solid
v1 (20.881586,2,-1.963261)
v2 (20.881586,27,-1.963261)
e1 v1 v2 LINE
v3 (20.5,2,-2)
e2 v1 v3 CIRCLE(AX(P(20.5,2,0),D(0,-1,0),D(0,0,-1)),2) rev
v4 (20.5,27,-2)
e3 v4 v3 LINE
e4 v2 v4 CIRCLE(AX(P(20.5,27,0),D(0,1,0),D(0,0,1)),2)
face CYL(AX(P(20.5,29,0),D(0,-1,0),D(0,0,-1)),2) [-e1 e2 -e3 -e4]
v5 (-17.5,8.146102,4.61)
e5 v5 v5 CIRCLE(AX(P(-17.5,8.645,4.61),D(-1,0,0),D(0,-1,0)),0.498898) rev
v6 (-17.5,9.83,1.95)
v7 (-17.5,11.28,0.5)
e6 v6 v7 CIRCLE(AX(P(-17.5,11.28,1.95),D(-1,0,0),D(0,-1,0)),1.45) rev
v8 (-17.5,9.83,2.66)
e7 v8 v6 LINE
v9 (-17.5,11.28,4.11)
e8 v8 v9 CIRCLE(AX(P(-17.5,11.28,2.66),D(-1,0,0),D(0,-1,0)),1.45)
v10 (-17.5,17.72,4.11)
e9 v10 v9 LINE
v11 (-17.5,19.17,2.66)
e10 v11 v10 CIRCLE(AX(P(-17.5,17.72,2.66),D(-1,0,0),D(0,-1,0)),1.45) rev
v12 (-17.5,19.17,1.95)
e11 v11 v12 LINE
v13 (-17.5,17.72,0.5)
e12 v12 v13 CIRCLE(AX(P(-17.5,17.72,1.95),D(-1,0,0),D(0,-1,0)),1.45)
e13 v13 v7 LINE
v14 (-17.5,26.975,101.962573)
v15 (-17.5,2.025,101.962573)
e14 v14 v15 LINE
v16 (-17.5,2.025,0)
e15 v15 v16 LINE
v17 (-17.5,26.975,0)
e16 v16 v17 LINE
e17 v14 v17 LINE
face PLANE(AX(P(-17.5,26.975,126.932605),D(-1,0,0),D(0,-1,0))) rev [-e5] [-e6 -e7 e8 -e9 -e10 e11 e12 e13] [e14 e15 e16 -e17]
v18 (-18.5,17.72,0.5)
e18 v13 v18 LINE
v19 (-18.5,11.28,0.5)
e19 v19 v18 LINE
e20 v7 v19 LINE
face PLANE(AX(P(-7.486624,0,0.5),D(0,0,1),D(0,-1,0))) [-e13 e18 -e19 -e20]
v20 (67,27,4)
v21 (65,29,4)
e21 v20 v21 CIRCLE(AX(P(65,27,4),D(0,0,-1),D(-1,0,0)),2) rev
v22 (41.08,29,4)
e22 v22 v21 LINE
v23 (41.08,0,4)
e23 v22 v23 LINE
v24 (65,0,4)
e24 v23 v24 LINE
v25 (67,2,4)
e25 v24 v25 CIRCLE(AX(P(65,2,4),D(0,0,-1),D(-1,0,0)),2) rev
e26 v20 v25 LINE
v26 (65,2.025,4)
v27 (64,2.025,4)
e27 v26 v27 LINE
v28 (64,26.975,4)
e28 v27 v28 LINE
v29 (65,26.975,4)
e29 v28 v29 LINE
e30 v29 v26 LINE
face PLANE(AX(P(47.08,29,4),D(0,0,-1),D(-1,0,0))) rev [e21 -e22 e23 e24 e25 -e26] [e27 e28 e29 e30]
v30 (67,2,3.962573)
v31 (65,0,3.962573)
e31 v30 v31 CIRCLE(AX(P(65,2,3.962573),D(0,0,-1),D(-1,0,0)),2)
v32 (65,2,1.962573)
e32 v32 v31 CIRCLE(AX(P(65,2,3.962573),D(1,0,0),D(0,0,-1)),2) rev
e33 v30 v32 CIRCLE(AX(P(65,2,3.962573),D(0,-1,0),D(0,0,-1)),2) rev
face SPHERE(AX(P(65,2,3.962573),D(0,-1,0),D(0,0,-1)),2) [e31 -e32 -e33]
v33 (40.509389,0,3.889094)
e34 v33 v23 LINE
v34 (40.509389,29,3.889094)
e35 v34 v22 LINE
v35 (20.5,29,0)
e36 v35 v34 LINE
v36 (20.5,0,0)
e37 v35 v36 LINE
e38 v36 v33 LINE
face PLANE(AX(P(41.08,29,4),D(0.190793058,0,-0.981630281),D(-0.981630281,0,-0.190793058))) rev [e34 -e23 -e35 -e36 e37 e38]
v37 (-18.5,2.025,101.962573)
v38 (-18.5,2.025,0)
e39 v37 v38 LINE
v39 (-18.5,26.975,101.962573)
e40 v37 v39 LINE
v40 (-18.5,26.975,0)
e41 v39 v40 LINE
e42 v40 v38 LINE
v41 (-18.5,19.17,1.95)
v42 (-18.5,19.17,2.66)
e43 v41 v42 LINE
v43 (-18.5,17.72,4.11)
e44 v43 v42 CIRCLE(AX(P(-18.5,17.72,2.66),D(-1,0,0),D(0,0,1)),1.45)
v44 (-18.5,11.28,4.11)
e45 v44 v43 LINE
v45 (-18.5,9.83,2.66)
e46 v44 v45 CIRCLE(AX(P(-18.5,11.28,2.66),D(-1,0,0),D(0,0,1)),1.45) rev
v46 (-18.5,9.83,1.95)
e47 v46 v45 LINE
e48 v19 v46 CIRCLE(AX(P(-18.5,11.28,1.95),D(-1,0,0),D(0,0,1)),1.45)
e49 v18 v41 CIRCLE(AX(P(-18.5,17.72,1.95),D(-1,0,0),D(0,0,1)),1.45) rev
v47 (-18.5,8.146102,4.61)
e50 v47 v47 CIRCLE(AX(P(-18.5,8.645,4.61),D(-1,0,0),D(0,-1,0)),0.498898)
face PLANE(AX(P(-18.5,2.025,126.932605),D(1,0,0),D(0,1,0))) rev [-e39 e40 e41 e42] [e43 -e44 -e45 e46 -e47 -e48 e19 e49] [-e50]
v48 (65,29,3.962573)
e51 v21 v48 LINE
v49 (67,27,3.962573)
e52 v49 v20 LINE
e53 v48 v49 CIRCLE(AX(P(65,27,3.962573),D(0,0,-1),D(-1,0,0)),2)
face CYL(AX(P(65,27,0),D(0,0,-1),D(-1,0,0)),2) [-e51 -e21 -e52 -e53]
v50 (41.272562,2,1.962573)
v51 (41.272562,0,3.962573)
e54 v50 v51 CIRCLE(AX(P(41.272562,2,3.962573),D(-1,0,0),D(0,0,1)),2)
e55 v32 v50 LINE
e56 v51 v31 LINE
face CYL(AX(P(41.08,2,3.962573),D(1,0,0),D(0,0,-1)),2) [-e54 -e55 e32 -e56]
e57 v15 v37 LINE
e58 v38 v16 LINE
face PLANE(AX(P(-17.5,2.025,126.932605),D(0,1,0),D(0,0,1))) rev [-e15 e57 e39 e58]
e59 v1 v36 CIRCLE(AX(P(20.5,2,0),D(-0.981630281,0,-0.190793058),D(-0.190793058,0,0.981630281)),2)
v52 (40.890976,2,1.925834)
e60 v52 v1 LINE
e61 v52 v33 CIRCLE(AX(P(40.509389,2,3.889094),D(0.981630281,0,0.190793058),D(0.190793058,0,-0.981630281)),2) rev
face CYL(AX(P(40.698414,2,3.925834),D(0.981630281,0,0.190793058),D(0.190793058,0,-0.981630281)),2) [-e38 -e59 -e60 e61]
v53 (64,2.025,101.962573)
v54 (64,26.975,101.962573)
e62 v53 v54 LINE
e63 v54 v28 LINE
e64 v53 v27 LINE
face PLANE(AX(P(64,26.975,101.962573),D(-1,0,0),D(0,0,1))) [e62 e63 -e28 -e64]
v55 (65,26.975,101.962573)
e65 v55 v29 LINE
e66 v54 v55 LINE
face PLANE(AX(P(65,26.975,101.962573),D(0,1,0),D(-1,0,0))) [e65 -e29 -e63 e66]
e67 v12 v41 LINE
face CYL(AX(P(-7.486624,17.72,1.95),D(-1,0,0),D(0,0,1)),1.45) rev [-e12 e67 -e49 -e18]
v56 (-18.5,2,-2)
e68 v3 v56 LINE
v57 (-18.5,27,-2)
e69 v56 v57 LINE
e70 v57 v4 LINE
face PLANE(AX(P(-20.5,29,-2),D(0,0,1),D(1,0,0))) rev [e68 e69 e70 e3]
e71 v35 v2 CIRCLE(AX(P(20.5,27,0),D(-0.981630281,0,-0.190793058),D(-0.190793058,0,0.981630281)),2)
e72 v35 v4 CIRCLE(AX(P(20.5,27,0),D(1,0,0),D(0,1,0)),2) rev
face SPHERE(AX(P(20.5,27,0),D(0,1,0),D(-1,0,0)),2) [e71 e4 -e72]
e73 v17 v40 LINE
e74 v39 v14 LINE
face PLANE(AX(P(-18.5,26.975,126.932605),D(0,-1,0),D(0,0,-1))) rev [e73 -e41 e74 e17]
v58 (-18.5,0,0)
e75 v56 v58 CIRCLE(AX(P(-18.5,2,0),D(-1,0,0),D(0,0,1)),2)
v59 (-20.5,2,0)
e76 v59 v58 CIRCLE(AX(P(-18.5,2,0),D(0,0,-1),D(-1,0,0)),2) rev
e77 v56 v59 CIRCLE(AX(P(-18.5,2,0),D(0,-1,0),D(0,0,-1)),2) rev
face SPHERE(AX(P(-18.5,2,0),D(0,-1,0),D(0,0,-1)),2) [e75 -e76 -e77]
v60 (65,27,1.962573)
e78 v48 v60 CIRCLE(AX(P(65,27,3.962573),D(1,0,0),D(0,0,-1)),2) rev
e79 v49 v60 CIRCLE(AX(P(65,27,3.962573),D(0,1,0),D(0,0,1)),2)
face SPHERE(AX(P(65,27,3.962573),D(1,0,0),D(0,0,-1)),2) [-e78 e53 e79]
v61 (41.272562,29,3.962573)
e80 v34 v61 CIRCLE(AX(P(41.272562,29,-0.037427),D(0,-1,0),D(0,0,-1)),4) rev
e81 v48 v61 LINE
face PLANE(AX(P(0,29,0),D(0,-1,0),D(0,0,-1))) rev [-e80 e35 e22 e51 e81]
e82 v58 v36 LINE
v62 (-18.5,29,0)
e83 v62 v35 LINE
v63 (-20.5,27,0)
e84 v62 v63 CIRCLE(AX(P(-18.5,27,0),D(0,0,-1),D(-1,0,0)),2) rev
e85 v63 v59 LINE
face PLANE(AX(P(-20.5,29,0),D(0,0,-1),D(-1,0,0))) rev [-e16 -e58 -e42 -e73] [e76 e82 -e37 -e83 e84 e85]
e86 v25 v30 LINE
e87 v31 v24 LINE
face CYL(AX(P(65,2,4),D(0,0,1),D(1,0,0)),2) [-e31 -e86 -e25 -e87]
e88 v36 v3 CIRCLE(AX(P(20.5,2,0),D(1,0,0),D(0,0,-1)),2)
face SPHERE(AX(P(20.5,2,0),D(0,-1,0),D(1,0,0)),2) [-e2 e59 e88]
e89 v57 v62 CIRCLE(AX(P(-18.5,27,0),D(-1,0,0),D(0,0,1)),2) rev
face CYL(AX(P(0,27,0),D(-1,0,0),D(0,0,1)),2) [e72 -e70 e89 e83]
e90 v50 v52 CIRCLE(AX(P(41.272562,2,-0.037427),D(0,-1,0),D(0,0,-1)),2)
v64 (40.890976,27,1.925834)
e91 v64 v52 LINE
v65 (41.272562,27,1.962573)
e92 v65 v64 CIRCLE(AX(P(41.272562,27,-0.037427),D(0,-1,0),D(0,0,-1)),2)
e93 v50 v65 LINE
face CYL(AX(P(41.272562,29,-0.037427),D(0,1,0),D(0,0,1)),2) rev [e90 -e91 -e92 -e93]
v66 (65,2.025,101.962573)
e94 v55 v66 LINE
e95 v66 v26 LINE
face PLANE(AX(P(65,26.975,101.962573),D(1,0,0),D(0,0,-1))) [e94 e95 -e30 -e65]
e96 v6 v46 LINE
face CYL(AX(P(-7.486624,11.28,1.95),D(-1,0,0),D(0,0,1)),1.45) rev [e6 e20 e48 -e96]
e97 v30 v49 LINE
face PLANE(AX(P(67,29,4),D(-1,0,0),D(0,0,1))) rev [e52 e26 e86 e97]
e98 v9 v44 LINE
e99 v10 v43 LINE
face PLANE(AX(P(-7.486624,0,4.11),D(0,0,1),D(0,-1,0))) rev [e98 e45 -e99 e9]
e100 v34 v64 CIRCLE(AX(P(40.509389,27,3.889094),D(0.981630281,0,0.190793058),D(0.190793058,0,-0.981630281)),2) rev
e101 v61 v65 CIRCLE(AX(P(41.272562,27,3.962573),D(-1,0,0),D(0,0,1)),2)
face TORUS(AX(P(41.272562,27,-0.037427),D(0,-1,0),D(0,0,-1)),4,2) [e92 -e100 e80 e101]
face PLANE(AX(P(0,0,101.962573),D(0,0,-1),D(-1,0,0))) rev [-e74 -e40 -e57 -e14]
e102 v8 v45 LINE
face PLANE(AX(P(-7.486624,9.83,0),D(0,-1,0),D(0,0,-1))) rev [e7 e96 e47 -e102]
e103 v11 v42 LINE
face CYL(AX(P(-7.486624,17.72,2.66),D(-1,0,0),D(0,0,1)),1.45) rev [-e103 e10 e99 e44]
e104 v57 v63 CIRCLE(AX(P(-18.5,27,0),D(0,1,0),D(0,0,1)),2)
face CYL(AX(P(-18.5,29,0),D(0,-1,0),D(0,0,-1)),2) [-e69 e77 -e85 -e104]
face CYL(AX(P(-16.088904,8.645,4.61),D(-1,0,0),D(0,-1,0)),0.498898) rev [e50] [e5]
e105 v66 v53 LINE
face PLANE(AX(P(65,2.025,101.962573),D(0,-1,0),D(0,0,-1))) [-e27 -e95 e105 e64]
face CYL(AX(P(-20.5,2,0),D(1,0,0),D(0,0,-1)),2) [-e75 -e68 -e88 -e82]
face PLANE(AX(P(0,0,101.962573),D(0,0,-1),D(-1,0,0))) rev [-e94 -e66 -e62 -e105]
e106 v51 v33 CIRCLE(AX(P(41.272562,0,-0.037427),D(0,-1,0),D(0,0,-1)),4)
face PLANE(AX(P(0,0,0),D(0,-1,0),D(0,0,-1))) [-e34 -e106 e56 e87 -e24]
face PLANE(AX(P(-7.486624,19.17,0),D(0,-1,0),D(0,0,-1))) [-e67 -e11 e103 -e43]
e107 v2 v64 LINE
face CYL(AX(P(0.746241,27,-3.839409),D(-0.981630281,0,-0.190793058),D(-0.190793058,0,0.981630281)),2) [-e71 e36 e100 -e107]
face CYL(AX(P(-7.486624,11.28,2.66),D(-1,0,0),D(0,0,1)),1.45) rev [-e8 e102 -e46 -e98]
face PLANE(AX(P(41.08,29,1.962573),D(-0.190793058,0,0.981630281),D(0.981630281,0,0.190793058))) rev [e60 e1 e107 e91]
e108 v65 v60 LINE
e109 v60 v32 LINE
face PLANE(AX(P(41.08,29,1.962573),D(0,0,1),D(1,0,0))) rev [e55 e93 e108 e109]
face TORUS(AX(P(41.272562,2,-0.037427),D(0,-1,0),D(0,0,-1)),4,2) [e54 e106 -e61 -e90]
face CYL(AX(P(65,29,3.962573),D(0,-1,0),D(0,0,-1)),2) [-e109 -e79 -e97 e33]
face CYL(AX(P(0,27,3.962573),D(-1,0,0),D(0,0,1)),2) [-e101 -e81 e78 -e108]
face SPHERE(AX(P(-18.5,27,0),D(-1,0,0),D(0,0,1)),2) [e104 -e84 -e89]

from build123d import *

# Parameters (mm, degrees)
BOSS_EXTRUDE1_DEPTH = 29
SKETCH2_W           = 1
SKETCH2_H           = 24.95
BOSS_EXTRUDE2_DEPTH = 100
SKETCH4_W           = 1
SKETCH4_H           = 24.95
BOSS_EXTRUDE3_DEPTH = 101.96257304
CUT_EXTRUDE1_DEPTH  = 1
SKETCH6_R           = 0.498897706
CUT_EXTRUDE2_DEPTH  = 1
FILLET1_R           = 2


with BuildPart() as part:
    # Sketch1 → Boss-Extrude1 (new body)
    with BuildSketch(Plane(origin=(0, 0, 0), x_dir=(1, 0, 0), z_dir=(0, 1, 0))):
        Polygon((-20.5, 0), (20.5, 0), (41.08, -4), (47.08, -4), (67, -4), (67, -1.96257304), (47.08, -1.96257304), (41.08, -1.96257304), (20.69256171, 2), (-20.5, 2), align=None)
    extrude(amount=BOSS_EXTRUDE1_DEPTH)

    # Sketch2 → Boss-Extrude2 (add)
    with BuildSketch(Plane(origin=(0, 0, 1.96257304), x_dir=(-1, 0, 0), z_dir=(0, 0, -1))):
        with Locations((-64.5, 14.5)):
            Rectangle(SKETCH2_W, SKETCH2_H)
    extrude(amount=-BOSS_EXTRUDE2_DEPTH)

    # Sketch4 → Boss-Extrude3 (add)
    with BuildSketch(Plane.XY):
        with Locations((-18, 14.5)):
            Rectangle(SKETCH4_W, SKETCH4_H)
    extrude(amount=BOSS_EXTRUDE3_DEPTH)

    # Sketch5 → Cut-Extrude1 (cut)
    with BuildSketch(Plane.ZY.offset(18.5)):
        with BuildLine():
            Line((1.95, 19.17), (2.66, 19.17))
            ThreePointArc((2.66, 19.17), (3.685304833, 18.745304833), (4.11, 17.72))
            Line((4.11, 17.72), (4.11, 11.28))
            ThreePointArc((4.11, 11.28), (3.685304833, 10.254695167), (2.66, 9.83))
            Line((2.66, 9.83), (1.95, 9.83))
            ThreePointArc((1.95, 9.83), (0.924695167, 10.254695167), (0.5, 11.28))
            Line((0.5, 11.28), (0.5, 17.72))
            ThreePointArc((0.5, 17.72), (0.924695167, 18.745304833), (1.95, 19.17))
        make_face()
    extrude(amount=-CUT_EXTRUDE1_DEPTH, mode=Mode.SUBTRACT)

    # Sketch6 → Cut-Extrude2 (cut)
    with BuildSketch(Plane.ZY.offset(18.5)):
        with Locations(Location((4.61, 8.645, 0), (0, 0, 270))):
            Circle(SKETCH6_R)
    extrude(amount=-CUT_EXTRUDE2_DEPTH, mode=Mode.SUBTRACT)

    # Fillet1
    fillet1_edges = [part.edges().sort_by_distance(p)[0] for p in [
        (0.096280855, 0, -2),
        (30.886280855, 0, -0.01871348),
        (54.04, 0, 1.96257304),
        (67, 0, 2.98128652),
        (-20.5, 0, -1),
        (-20.5, 14.5, -2),
        (20.69256171, 14.5, -2),
        (41.08, 14.5, 1.96257304),
        (67, 14.5, 1.96257304),
        (67, 29, 2.98128652),
        (54.04, 29, 1.96257304),
        (30.886280855, 29, -0.01871348),
        (0.096280855, 29, -2),
        (-20.5, 29, -1),
    ]]
    fillet(fillet1_edges, radius=FILLET1_R - 0.0001)  # a hair under: the kernel refuses the full size


solid = part.part
